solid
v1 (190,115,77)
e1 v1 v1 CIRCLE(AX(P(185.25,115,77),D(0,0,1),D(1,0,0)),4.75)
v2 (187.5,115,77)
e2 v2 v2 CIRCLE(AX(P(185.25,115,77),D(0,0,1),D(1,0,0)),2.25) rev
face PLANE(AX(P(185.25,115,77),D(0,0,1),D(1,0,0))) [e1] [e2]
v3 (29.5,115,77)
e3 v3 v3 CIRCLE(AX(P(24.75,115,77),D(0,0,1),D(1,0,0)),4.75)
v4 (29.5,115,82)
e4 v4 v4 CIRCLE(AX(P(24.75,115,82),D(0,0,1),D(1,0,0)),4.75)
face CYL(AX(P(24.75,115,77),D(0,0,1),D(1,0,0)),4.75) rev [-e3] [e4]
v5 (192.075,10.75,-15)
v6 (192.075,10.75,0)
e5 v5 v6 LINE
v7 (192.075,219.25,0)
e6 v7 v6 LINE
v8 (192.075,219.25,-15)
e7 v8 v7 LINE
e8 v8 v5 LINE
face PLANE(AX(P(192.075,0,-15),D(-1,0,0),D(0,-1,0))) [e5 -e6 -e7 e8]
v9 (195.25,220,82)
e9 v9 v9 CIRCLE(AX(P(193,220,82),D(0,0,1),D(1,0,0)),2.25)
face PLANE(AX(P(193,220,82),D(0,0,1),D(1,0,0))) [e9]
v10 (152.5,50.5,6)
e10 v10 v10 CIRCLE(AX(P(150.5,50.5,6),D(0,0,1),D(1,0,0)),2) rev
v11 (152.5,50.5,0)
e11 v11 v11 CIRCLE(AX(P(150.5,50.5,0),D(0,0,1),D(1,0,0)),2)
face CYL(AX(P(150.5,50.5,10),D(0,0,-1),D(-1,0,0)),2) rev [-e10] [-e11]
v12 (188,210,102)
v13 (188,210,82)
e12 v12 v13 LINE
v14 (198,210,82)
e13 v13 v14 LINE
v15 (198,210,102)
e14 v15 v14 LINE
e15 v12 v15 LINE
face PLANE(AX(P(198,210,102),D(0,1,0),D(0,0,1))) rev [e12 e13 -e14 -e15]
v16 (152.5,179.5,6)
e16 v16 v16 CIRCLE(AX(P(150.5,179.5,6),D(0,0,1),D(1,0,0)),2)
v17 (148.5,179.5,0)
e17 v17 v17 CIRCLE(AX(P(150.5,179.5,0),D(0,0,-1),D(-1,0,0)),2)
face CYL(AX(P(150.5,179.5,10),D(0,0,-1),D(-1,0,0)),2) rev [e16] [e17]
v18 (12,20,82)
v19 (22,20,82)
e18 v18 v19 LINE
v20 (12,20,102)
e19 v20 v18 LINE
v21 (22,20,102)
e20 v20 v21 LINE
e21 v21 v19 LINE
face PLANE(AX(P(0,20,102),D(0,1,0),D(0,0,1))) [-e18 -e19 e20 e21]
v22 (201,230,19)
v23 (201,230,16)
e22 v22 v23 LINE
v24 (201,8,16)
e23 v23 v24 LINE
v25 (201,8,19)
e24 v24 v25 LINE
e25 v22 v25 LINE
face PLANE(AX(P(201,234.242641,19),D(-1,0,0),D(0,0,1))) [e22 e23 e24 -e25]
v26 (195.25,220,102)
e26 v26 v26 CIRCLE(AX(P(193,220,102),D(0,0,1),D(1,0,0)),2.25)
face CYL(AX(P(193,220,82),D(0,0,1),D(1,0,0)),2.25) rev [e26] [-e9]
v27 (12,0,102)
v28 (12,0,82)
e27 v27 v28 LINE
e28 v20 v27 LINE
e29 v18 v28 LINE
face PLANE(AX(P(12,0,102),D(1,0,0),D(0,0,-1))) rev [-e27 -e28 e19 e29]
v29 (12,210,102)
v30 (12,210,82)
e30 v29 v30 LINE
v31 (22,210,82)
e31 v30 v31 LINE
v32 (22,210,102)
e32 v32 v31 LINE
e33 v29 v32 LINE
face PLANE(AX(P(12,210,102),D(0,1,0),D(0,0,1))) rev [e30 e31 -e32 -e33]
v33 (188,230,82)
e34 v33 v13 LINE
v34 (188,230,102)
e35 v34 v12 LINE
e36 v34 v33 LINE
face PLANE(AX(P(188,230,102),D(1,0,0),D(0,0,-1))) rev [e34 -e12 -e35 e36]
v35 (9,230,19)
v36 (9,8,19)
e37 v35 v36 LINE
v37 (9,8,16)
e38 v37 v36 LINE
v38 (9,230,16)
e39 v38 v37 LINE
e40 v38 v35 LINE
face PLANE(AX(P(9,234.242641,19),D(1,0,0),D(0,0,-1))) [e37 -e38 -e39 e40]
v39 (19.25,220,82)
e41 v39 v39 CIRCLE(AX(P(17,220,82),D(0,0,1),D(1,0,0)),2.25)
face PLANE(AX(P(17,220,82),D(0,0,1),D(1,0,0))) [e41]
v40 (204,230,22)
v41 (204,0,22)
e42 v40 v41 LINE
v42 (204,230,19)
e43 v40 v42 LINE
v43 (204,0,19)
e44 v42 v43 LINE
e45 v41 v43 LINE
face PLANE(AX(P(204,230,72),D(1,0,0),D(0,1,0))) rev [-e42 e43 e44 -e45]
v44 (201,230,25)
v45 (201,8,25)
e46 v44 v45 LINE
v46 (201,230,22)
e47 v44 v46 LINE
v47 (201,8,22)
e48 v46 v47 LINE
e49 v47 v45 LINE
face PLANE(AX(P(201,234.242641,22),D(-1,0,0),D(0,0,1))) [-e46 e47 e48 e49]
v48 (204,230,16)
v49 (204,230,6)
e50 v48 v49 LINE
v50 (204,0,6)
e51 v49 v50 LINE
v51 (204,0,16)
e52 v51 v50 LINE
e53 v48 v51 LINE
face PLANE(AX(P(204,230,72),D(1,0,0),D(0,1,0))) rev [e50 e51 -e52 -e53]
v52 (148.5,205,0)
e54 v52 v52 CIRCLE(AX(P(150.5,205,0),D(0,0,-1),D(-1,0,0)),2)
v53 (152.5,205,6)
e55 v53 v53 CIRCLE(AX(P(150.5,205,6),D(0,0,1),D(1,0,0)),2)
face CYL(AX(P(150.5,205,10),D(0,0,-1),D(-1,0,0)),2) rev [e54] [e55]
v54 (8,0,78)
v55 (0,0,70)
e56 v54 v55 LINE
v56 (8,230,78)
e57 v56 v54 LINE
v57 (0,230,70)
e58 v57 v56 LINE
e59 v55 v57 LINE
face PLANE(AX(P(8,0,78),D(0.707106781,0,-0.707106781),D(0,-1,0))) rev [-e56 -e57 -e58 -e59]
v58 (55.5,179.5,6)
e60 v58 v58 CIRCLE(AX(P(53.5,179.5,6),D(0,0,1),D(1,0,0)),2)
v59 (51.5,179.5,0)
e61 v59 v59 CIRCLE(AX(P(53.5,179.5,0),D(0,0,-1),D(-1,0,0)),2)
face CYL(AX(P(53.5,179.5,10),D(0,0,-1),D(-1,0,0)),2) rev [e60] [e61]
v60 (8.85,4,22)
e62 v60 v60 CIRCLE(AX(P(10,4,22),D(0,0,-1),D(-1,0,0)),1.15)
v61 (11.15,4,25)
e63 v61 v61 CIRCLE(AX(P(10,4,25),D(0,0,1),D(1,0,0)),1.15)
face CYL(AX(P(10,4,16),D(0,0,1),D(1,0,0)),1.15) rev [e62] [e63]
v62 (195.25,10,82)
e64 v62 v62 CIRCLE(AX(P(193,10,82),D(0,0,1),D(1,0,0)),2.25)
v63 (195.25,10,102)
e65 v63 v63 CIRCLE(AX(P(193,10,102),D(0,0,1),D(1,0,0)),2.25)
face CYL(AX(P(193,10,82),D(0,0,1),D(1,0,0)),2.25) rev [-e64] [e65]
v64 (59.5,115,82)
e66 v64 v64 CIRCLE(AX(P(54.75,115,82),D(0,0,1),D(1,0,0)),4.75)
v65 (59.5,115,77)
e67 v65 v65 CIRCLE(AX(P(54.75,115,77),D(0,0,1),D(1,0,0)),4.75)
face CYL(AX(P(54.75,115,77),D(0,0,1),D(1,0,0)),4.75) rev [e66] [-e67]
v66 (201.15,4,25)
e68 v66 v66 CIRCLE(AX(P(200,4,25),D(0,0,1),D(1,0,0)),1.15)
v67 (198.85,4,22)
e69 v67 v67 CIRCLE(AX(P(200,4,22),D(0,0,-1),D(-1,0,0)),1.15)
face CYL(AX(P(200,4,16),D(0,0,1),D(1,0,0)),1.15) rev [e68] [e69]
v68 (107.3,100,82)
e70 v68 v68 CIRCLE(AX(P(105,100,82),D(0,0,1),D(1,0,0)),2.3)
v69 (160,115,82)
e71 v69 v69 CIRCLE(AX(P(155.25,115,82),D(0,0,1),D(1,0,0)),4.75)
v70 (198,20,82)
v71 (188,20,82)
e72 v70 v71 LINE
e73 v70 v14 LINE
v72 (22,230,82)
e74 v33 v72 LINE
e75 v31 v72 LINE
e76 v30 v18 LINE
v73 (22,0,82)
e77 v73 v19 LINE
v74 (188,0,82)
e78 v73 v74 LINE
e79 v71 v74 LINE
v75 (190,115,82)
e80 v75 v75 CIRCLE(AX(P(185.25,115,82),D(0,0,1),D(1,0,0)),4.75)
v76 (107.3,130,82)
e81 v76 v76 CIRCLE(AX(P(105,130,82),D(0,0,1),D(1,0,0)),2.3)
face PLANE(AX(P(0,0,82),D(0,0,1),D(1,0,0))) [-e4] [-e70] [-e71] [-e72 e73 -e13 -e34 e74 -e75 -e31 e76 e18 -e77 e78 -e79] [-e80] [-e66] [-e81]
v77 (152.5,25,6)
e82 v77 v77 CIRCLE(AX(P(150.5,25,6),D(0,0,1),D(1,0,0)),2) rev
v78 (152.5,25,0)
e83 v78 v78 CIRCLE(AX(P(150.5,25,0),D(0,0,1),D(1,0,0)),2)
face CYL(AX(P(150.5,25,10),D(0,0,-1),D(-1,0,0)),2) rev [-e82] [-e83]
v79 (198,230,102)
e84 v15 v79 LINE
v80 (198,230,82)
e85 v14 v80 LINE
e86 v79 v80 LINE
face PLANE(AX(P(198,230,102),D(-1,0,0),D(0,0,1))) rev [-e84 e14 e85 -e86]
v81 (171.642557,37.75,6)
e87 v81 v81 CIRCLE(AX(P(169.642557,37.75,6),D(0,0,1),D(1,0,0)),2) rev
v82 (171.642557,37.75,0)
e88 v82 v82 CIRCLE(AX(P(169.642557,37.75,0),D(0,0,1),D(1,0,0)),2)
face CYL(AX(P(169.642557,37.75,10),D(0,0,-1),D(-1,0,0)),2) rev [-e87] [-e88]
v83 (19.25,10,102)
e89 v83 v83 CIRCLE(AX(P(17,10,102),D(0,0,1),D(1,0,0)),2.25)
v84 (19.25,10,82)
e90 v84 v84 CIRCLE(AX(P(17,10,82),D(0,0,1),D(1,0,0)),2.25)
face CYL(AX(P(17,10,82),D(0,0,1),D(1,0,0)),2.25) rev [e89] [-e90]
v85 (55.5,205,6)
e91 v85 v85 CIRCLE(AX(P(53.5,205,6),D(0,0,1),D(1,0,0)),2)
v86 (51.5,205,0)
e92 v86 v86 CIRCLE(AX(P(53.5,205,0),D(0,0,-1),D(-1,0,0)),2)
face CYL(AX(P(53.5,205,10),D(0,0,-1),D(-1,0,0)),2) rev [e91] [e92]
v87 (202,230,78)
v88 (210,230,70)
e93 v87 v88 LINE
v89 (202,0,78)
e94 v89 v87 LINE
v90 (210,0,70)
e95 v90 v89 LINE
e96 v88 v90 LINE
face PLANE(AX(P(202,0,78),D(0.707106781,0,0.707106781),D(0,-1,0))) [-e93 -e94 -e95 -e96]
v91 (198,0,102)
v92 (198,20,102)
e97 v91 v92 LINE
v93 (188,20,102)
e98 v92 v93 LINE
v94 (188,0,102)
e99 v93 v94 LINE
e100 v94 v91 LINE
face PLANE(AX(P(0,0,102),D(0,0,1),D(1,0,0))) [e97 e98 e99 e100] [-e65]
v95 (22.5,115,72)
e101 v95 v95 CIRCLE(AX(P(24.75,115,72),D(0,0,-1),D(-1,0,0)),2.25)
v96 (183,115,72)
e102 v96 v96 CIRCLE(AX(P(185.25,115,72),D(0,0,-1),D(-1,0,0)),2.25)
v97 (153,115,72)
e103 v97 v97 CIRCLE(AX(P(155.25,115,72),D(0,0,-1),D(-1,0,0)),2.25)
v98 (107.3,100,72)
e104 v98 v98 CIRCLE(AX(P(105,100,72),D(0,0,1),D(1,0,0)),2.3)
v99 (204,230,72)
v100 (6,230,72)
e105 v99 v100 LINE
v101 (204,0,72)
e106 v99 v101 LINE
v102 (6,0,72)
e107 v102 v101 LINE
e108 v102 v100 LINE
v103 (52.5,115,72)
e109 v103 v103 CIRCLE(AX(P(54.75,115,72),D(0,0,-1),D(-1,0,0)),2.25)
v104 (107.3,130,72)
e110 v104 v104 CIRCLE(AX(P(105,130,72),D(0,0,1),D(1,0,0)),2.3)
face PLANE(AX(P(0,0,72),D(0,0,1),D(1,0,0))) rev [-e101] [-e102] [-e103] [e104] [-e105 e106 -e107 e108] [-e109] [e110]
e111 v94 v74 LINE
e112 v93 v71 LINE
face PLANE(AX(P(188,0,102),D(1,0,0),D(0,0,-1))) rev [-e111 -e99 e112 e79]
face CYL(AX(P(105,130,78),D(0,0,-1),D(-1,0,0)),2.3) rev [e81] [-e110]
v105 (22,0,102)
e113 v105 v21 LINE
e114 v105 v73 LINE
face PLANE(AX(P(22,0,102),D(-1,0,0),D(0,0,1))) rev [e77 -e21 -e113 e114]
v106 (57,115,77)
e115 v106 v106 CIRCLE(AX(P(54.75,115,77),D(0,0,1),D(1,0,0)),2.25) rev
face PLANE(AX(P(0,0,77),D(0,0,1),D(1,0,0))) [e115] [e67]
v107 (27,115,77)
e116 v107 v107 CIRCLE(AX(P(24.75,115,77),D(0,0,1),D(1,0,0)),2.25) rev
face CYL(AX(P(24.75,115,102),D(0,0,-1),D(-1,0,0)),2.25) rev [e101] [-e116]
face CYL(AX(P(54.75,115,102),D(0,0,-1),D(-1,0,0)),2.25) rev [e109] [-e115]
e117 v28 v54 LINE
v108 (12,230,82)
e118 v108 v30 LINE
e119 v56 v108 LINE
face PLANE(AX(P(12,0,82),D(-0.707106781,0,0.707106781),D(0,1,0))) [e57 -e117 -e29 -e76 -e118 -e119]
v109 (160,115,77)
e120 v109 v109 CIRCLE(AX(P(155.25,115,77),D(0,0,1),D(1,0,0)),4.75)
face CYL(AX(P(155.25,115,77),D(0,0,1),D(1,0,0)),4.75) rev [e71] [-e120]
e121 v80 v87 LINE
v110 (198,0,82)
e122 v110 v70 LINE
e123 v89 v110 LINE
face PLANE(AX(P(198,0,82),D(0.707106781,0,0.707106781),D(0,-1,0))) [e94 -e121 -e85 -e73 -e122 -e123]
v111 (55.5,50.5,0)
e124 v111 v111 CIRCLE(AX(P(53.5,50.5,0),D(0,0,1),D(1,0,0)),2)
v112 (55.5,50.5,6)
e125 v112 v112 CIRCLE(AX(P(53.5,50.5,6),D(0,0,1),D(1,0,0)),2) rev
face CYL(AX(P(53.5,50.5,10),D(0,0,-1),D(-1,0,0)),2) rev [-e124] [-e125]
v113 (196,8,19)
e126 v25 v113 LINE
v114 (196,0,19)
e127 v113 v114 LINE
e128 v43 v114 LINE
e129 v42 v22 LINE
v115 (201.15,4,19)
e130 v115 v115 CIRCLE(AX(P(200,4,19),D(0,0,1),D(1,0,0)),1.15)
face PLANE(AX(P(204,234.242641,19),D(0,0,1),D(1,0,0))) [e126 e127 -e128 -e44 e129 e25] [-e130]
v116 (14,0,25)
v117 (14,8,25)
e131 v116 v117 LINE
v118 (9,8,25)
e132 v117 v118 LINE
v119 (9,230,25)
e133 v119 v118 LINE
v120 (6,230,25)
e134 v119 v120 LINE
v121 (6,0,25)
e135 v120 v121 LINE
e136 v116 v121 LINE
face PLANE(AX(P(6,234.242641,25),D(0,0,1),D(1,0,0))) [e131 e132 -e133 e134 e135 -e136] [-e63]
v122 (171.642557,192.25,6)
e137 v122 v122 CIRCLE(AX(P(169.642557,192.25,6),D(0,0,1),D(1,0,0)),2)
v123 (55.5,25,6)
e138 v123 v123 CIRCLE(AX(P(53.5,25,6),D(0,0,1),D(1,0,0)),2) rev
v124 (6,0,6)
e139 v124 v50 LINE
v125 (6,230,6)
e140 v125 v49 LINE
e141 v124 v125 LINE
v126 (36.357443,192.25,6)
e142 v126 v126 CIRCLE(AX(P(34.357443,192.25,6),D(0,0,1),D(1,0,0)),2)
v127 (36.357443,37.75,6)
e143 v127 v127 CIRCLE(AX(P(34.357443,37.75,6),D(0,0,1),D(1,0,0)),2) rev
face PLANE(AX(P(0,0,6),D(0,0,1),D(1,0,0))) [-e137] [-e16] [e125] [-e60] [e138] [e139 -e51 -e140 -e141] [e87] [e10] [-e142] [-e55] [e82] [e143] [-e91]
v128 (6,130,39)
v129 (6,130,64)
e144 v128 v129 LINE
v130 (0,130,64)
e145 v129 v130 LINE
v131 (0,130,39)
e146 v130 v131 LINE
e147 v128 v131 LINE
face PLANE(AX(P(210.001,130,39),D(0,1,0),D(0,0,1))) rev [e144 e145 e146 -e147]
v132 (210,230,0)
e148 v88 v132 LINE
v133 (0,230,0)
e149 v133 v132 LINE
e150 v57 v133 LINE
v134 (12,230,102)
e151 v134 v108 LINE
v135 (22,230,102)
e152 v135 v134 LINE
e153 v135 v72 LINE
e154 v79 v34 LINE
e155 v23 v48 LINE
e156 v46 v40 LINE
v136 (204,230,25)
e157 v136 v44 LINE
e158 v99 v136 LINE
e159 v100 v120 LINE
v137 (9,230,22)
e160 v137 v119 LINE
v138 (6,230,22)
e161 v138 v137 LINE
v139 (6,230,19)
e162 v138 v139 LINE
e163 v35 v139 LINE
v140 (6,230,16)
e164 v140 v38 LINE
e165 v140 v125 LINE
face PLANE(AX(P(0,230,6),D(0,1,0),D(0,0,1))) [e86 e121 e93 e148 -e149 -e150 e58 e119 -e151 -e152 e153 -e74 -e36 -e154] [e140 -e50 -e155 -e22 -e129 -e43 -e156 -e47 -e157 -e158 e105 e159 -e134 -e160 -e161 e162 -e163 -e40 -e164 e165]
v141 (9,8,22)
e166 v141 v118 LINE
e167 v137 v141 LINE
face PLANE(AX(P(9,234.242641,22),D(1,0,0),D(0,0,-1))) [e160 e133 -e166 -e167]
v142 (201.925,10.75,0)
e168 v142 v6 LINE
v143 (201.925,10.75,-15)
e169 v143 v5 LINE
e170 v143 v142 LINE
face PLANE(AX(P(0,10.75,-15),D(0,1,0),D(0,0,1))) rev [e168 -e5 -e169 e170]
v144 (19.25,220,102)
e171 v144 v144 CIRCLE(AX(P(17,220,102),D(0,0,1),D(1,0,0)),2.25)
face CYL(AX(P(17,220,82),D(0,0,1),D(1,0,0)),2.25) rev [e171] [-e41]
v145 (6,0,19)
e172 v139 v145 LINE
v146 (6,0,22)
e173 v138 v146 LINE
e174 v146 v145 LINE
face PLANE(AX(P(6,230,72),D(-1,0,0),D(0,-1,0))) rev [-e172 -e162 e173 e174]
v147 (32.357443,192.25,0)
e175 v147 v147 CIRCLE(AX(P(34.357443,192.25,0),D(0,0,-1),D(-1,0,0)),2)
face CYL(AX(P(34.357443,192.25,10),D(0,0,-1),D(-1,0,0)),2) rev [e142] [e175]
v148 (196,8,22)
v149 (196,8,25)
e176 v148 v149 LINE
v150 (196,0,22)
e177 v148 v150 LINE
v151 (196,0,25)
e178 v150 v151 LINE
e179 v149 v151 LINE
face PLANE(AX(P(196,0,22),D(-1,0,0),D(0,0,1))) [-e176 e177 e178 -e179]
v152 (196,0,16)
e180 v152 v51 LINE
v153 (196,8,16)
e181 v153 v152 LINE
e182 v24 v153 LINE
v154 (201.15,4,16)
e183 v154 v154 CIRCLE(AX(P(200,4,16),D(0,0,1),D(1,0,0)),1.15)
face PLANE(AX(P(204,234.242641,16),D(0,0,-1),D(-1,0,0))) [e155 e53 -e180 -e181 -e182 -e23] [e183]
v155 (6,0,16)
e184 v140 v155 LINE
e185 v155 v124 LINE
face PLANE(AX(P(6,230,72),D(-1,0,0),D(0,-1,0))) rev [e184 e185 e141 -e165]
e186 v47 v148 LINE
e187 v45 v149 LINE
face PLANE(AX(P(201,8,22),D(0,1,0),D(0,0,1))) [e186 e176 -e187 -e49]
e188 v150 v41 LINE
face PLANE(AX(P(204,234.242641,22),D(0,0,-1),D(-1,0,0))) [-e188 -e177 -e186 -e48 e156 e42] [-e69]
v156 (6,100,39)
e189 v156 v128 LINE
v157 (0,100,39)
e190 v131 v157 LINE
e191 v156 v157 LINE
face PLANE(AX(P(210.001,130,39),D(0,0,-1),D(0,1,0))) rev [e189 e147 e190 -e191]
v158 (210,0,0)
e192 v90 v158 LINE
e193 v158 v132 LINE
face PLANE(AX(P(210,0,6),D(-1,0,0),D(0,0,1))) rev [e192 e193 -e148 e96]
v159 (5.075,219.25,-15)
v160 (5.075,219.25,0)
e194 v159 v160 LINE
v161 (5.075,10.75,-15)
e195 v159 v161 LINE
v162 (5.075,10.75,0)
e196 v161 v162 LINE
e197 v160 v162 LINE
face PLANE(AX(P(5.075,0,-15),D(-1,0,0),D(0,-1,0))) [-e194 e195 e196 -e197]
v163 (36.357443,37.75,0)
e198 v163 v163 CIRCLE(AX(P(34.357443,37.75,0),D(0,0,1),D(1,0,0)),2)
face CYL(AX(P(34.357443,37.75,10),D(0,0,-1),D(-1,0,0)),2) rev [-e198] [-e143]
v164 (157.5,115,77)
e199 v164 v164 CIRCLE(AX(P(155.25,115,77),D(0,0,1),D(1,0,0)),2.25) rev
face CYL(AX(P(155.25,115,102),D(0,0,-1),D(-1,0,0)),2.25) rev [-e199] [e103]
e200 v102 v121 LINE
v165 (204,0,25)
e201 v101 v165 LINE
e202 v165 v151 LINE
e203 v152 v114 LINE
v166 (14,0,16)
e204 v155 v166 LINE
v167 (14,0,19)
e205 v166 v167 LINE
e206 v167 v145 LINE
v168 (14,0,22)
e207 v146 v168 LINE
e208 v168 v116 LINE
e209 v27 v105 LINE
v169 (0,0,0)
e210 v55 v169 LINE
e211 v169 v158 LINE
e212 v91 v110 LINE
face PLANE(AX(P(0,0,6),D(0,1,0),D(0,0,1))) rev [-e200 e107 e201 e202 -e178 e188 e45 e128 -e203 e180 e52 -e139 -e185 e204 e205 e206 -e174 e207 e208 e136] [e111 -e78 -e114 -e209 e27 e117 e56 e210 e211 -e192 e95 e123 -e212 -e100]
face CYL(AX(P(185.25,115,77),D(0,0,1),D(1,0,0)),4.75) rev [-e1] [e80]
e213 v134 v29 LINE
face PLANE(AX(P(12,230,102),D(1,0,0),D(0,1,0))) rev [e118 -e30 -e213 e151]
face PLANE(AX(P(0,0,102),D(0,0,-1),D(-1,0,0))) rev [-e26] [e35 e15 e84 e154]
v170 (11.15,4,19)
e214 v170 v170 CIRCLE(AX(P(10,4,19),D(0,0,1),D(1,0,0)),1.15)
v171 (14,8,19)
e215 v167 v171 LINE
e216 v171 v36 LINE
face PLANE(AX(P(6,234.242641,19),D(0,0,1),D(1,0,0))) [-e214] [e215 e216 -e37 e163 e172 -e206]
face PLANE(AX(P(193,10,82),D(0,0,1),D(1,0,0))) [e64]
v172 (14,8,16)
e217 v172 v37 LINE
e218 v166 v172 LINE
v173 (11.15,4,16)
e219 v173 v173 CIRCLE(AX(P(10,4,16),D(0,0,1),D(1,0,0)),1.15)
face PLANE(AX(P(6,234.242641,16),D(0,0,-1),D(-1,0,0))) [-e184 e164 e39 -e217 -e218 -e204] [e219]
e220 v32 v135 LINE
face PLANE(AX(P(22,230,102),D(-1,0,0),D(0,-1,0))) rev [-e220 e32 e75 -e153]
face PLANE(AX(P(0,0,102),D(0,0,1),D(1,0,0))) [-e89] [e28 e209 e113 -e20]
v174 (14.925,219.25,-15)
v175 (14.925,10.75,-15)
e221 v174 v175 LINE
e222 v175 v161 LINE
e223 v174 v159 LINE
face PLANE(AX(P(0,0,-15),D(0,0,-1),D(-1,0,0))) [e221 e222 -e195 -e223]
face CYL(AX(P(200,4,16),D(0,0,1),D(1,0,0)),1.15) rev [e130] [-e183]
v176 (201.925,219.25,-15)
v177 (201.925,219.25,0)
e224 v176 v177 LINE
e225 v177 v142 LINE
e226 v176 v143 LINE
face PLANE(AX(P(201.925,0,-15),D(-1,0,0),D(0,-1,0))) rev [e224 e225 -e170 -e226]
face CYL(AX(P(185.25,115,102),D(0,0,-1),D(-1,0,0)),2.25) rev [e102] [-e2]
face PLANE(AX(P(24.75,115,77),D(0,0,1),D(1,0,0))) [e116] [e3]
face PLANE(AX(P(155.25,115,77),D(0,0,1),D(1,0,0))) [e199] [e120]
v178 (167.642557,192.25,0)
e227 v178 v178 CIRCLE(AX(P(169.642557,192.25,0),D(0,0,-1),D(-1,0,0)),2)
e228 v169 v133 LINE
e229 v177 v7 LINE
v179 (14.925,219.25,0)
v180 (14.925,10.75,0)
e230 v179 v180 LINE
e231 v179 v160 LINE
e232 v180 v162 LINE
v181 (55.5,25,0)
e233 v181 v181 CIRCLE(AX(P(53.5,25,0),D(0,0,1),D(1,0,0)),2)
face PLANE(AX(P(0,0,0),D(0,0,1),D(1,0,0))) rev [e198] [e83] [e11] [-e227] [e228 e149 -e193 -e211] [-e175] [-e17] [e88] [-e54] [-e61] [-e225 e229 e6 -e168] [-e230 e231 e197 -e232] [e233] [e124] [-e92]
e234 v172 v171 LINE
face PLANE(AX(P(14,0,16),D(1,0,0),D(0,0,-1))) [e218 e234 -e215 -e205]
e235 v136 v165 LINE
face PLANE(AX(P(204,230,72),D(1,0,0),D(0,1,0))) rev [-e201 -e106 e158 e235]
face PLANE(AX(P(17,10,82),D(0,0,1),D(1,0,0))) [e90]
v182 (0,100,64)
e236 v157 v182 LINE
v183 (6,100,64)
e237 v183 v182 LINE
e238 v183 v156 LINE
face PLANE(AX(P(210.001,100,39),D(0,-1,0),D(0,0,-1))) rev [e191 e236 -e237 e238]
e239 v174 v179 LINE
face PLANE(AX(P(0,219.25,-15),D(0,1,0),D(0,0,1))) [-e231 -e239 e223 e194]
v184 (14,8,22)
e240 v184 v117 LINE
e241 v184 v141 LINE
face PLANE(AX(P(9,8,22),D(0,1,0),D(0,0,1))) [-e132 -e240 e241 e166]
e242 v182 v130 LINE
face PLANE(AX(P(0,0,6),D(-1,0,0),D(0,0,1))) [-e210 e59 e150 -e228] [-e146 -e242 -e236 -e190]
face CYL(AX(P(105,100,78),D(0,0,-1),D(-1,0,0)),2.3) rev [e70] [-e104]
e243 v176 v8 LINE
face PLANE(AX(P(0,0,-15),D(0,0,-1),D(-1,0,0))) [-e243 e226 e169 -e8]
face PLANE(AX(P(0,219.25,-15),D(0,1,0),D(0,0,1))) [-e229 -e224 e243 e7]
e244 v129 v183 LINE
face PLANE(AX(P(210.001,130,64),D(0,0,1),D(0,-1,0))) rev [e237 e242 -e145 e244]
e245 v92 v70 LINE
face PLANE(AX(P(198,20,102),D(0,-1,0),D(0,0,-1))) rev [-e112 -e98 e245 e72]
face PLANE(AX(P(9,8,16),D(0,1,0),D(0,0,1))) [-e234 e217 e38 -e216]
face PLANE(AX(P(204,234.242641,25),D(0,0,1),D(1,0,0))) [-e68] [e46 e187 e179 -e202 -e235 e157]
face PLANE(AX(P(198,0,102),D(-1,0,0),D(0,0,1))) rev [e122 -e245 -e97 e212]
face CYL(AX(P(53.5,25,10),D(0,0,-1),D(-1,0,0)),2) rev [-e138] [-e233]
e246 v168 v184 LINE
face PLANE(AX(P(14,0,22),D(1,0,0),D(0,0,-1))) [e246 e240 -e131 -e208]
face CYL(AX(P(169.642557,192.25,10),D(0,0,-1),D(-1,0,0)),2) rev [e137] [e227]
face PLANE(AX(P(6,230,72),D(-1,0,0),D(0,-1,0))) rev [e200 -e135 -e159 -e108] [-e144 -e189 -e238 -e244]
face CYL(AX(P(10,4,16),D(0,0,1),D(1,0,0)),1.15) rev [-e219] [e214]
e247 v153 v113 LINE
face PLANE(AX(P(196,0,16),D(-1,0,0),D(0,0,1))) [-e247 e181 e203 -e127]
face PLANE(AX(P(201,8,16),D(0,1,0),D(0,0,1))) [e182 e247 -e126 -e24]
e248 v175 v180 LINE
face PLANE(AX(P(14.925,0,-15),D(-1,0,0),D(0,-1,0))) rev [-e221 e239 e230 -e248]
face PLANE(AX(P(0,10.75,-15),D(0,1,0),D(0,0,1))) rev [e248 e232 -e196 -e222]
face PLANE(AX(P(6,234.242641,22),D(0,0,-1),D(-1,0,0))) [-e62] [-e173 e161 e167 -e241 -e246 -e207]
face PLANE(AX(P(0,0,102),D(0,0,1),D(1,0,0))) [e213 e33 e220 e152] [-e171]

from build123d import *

# Parameters (mm, degrees)
SKETCH_1_W           = 210
SKETCH_1_H           = 230
EXTRUDE_1_DEPTH      = 6
SKETCH_2_W           = 9.85
SKETCH_2_H           = 208.5
EXTRUDE_3_DEPTH      = 15
SKETCH_3_R           = 2
CUT_EXTRUDE_1_DEPTH  = 10
SKETCH_17_W          = 6
SKETCH_17_H          = 230
EXTRUDE_9_DEPTH      = 66
EXTRUDE_10_DEPTH     = 6
CHAMFER_3_SIZE       = 8
SKETCH_21_R          = 2.3
CUT_EXTRUDE_9_DEPTH  = 6
SKETCH_34_R          = 2.25
CUT_EXTRUDE_14_DEPTH = 30
SKETCH_36_R          = 2.25
CUT_EXTRUDE_15_DEPTH = 30
SKETCH_51_W          = 194
SKETCH_51_H          = 230
EXTRUDE_22_DEPTH     = 4
CHAMFER_6_SIZE       = 4
CUT_EXTRUDE_START    = -5
SKETCH_54_R          = 4.75
SKETCH_54_R_2        = 2.3
CUT_EXTRUDE_21_DEPTH = 5
CUT_EXTRUDE_23_REACH = 324.062
SKETCH_60_W          = 25
SKETCH_60_H          = 30
SKETCH_61_W          = 3
SKETCH_61_H          = 3
EXTRUDE_25_DEPTH     = 230
SKETCH_63_W          = 5
SKETCH_63_H          = 8
EXTRUDE_26_DEPTH     = 3
SKETCH_65_W          = 5
SKETCH_65_H          = 8
EXTRUDE_27_DEPTH     = 3
SKETCH_64_R          = 1.15
CUT_EXTRUDE_24_DEPTH = 9
SKETCH_66_W          = 5
SKETCH_66_H          = 8
EXTRUDE_28_DEPTH     = 3
SKETCH_67_W          = 5
SKETCH_67_H          = 8
EXTRUDE_29_DEPTH     = 3
SKETCH_68_R          = 1.15
CUT_EXTRUDE_25_DEPTH = 9
SKETCH_69_W          = 10
SKETCH_69_H          = 20
EXTRUDE_30_DEPTH     = 20
SKETCH_70_W          = 10
SKETCH_70_H          = 20
EXTRUDE_31_DEPTH     = 20
SKETCH_72_R          = 2.25
CUT_EXTRUDE_26_DEPTH = 20


with BuildPart() as part:
    # 草图1 → 凸台-拉伸1 (new body)
    with BuildSketch(Plane.XY):
        with Locations((105, 115)):
            Rectangle(SKETCH_1_W, SKETCH_1_H)
    extrude(amount=EXTRUDE_1_DEPTH)

    # 草图2 → 凸台-拉伸3 (add)
    with BuildSketch(Plane(origin=(0, 0, 0), x_dir=(-1, 0, 0), z_dir=(0, 0, -1))):
        with Locations((-197, 115)):
            Rectangle(SKETCH_2_W, SKETCH_2_H)
        with Locations((-10, 115)):
            Rectangle(SKETCH_2_W, SKETCH_2_H)
    extrude(amount=EXTRUDE_3_DEPTH)

    # 草图3 → 切除-拉伸1 (cut)
    with BuildSketch(Plane(origin=(0, 0, 0), x_dir=(-1, 0, 0), z_dir=(0, 0, -1))):
        with Locations((-169.6425573, 192.25)):
            Circle(SKETCH_3_R)
        with Locations((-150.5, 205)):
            Circle(SKETCH_3_R)
        with Locations((-150.5, 179.5)):
            Circle(SKETCH_3_R)
        with Locations(Location((-150.5, 50.5, 0), (0, 0, 180))):
            Circle(SKETCH_3_R)
        with Locations(Location((-150.5, 25, 0), (0, 0, 180))):
            Circle(SKETCH_3_R)
        with Locations(Location((-169.6425573, 37.75, 0), (0, 0, 180))):
            Circle(SKETCH_3_R)
        with Locations((-34.3574427, 192.25)):
            Circle(SKETCH_3_R)
        with Locations((-53.5, 205)):
            Circle(SKETCH_3_R)
        with Locations((-53.5, 179.5)):
            Circle(SKETCH_3_R)
        with Locations(Location((-53.5, 50.5, 0), (0, 0, 180))):
            Circle(SKETCH_3_R)
        with Locations(Location((-53.5, 25, 0), (0, 0, 180))):
            Circle(SKETCH_3_R)
        with Locations(Location((-34.3574427, 37.75, 0), (0, 0, 180))):
            Circle(SKETCH_3_R)
    extrude(amount=-CUT_EXTRUDE_1_DEPTH, mode=Mode.SUBTRACT)

    # 草图17 → 凸台-拉伸9 (add)
    with BuildSketch(Plane.XY.offset(6)):
        with Locations((3, 115)):
            Rectangle(SKETCH_17_W, SKETCH_17_H)
        with Locations((207, 115)):
            Rectangle(SKETCH_17_W, SKETCH_17_H)
    extrude(amount=EXTRUDE_9_DEPTH)

    # 草图18 → 凸台-拉伸10 (add)
    with BuildSketch(Plane.XY.offset(72)):
        Polygon((210, 230), (204, 230), (6, 230), (0, 230), (0, 0), (6, 0), (204, 0), (210, 0), align=None)
    extrude(amount=EXTRUDE_10_DEPTH)

    # 倒角3
    chamfer_3_edges = [part.edges().sort_by_distance(p)[0] for p in [
        (210, 115, 78),
        (0, 115, 78),
    ]]
    chamfer(chamfer_3_edges, length=CHAMFER_3_SIZE)

    # 草图21 → 切除-拉伸9 (cut)
    with BuildSketch(Plane.XY.offset(72)):
        with Locations((105, 130)):
            Circle(SKETCH_21_R)
        with Locations((105, 100)):
            Circle(SKETCH_21_R)
    extrude(amount=CUT_EXTRUDE_9_DEPTH, mode=Mode.SUBTRACT)

    # 草图34 → 切除-拉伸14 (cut)
    with BuildSketch(Plane(origin=(0, 0, 72), x_dir=(-1, 0, 0), z_dir=(0, 0, -1))):
        with Locations((-185.25, 115)):
            Circle(SKETCH_34_R)
        with Locations((-155.25, 115)):
            Circle(SKETCH_34_R)
    extrude(amount=-CUT_EXTRUDE_14_DEPTH, mode=Mode.SUBTRACT)

    # 草图36 → 切除-拉伸15 (cut)
    with BuildSketch(Plane(origin=(0, 0, 72), x_dir=(-1, 0, 0), z_dir=(0, 0, -1))):
        with Locations((-54.75, 115)):
            Circle(SKETCH_36_R)
        with Locations((-24.75, 115)):
            Circle(SKETCH_36_R)
    extrude(amount=-CUT_EXTRUDE_15_DEPTH, mode=Mode.SUBTRACT)

    # 草图51 → 凸台-拉伸22 (add)
    with BuildSketch(Plane.XY.offset(78)):
        with Locations((105, 115)):
            Rectangle(SKETCH_51_W, SKETCH_51_H)
    extrude(amount=EXTRUDE_22_DEPTH)

    # 倒角6
    chamfer_6_edges = [part.edges().sort_by_distance(p)[0] for p in [
        (202, 115, 82),
        (8, 115, 82),
    ]]
    chamfer(chamfer_6_edges, length=CHAMFER_6_SIZE - 0.0001)  # a hair under: the kernel refuses the full size

    # 草图54 → 切除-拉伸21 (cut)
    with BuildSketch(Plane.XY.offset(82).offset(CUT_EXTRUDE_START)):
        with Locations((54.75, 115)):
            Circle(SKETCH_54_R)
        with Locations((105, 130)):
            Circle(SKETCH_54_R_2)
        with Locations((105, 100)):
            Circle(SKETCH_54_R_2)
        with Locations((24.75, 115)):
            Circle(SKETCH_54_R)
        with Locations((155.25, 115)):
            Circle(SKETCH_54_R)
        with Locations((185.25, 115)):
            Circle(SKETCH_54_R)
    extrude(amount=CUT_EXTRUDE_21_DEPTH, mode=Mode.SUBTRACT)

    # 草图60 → 切除-拉伸23 (cut, up to next)
    with BuildSketch(Plane.ZY, mode=Mode.PRIVATE) as cut_extrude_23_sk1:
        with Locations((51.5, 115)):
            Rectangle(SKETCH_60_W, SKETCH_60_H)
    cut_extrude_23_tool1 = extrude(cut_extrude_23_sk1.sketch, amount=-CUT_EXTRUDE_23_REACH, mode=Mode.PRIVATE) & part.part
    add(cut_extrude_23_tool1.solids().sort_by_distance((0, 115, 51.5))[0], mode=Mode.SUBTRACT)

    # 草图61 → 凸台-拉伸25 (add)
    with BuildSketch(Plane.XZ):
        with Locations((7.5, 23.5)):
            Rectangle(SKETCH_61_W, SKETCH_61_H)
        with Locations((7.5, 17.5)):
            Rectangle(SKETCH_61_W, SKETCH_61_H)
        with Locations((202.5, 17.5)):
            Rectangle(SKETCH_61_W, SKETCH_61_H)
        with Locations((202.5, 23.5)):
            Rectangle(SKETCH_61_W, SKETCH_61_H)
    extrude(amount=-EXTRUDE_25_DEPTH)

    # 草图63 → 凸台-拉伸26 (add)
    with BuildSketch(Plane.XY.offset(25)):
        with Locations((11.5, 4)):
            Rectangle(SKETCH_63_W, SKETCH_63_H)
    extrude(amount=-EXTRUDE_26_DEPTH)

    # 草图65 → 凸台-拉伸27 (add)
    with BuildSketch(Plane.XY.offset(19)):
        with Locations((11.5, 4)):
            Rectangle(SKETCH_65_W, SKETCH_65_H)
    extrude(amount=-EXTRUDE_27_DEPTH)

    # 草图64 → 切除-拉伸24 (cut)
    with BuildSketch(Plane.XY.offset(25)):
        with Locations((10, 4)):
            Circle(SKETCH_64_R)
    extrude(amount=-CUT_EXTRUDE_24_DEPTH, mode=Mode.SUBTRACT)

    # 草图66 → 凸台-拉伸28 (add)
    with BuildSketch(Plane.XY.offset(25)):
        with Locations((198.5, 4)):
            Rectangle(SKETCH_66_W, SKETCH_66_H)
    extrude(amount=-EXTRUDE_28_DEPTH)

    # 草图67 → 凸台-拉伸29 (add)
    with BuildSketch(Plane.XY.offset(19)):
        with Locations((198.5, 4)):
            Rectangle(SKETCH_67_W, SKETCH_67_H)
    extrude(amount=-EXTRUDE_29_DEPTH)

    # 草图68 → 切除-拉伸25 (cut)
    with BuildSketch(Plane.XY.offset(25)):
        with Locations((200, 4)):
            Circle(SKETCH_68_R)
    extrude(amount=-CUT_EXTRUDE_25_DEPTH, mode=Mode.SUBTRACT)

    # 草图69 → 凸台-拉伸30 (add)
    with BuildSketch(Plane.XY.offset(82)):
        with Locations((17, 10)):
            Rectangle(SKETCH_69_W, SKETCH_69_H)
    extrude(amount=EXTRUDE_30_DEPTH)

    # 草图70 → 凸台-拉伸31 (add)
    with BuildSketch(Plane.XY.offset(82)):
        with Locations((193, 10)):
            Rectangle(SKETCH_70_W, SKETCH_70_H)
        with Locations((193, 220)):
            Rectangle(SKETCH_70_W, SKETCH_70_H)
        with Locations((17, 220)):
            Rectangle(SKETCH_70_W, SKETCH_70_H)
    extrude(amount=EXTRUDE_31_DEPTH)

    # 草图72 → 切除-拉伸26 (cut)
    with BuildSketch(Plane.XY.offset(102)):
        with Locations((17, 220)):
            Circle(SKETCH_72_R)
        with Locations((193, 220)):
            Circle(SKETCH_72_R)
        with Locations((193, 10)):
            Circle(SKETCH_72_R)
        with Locations((17, 10)):
            Circle(SKETCH_72_R)
    extrude(amount=-CUT_EXTRUDE_26_DEPTH, mode=Mode.SUBTRACT)


solid = part.part
